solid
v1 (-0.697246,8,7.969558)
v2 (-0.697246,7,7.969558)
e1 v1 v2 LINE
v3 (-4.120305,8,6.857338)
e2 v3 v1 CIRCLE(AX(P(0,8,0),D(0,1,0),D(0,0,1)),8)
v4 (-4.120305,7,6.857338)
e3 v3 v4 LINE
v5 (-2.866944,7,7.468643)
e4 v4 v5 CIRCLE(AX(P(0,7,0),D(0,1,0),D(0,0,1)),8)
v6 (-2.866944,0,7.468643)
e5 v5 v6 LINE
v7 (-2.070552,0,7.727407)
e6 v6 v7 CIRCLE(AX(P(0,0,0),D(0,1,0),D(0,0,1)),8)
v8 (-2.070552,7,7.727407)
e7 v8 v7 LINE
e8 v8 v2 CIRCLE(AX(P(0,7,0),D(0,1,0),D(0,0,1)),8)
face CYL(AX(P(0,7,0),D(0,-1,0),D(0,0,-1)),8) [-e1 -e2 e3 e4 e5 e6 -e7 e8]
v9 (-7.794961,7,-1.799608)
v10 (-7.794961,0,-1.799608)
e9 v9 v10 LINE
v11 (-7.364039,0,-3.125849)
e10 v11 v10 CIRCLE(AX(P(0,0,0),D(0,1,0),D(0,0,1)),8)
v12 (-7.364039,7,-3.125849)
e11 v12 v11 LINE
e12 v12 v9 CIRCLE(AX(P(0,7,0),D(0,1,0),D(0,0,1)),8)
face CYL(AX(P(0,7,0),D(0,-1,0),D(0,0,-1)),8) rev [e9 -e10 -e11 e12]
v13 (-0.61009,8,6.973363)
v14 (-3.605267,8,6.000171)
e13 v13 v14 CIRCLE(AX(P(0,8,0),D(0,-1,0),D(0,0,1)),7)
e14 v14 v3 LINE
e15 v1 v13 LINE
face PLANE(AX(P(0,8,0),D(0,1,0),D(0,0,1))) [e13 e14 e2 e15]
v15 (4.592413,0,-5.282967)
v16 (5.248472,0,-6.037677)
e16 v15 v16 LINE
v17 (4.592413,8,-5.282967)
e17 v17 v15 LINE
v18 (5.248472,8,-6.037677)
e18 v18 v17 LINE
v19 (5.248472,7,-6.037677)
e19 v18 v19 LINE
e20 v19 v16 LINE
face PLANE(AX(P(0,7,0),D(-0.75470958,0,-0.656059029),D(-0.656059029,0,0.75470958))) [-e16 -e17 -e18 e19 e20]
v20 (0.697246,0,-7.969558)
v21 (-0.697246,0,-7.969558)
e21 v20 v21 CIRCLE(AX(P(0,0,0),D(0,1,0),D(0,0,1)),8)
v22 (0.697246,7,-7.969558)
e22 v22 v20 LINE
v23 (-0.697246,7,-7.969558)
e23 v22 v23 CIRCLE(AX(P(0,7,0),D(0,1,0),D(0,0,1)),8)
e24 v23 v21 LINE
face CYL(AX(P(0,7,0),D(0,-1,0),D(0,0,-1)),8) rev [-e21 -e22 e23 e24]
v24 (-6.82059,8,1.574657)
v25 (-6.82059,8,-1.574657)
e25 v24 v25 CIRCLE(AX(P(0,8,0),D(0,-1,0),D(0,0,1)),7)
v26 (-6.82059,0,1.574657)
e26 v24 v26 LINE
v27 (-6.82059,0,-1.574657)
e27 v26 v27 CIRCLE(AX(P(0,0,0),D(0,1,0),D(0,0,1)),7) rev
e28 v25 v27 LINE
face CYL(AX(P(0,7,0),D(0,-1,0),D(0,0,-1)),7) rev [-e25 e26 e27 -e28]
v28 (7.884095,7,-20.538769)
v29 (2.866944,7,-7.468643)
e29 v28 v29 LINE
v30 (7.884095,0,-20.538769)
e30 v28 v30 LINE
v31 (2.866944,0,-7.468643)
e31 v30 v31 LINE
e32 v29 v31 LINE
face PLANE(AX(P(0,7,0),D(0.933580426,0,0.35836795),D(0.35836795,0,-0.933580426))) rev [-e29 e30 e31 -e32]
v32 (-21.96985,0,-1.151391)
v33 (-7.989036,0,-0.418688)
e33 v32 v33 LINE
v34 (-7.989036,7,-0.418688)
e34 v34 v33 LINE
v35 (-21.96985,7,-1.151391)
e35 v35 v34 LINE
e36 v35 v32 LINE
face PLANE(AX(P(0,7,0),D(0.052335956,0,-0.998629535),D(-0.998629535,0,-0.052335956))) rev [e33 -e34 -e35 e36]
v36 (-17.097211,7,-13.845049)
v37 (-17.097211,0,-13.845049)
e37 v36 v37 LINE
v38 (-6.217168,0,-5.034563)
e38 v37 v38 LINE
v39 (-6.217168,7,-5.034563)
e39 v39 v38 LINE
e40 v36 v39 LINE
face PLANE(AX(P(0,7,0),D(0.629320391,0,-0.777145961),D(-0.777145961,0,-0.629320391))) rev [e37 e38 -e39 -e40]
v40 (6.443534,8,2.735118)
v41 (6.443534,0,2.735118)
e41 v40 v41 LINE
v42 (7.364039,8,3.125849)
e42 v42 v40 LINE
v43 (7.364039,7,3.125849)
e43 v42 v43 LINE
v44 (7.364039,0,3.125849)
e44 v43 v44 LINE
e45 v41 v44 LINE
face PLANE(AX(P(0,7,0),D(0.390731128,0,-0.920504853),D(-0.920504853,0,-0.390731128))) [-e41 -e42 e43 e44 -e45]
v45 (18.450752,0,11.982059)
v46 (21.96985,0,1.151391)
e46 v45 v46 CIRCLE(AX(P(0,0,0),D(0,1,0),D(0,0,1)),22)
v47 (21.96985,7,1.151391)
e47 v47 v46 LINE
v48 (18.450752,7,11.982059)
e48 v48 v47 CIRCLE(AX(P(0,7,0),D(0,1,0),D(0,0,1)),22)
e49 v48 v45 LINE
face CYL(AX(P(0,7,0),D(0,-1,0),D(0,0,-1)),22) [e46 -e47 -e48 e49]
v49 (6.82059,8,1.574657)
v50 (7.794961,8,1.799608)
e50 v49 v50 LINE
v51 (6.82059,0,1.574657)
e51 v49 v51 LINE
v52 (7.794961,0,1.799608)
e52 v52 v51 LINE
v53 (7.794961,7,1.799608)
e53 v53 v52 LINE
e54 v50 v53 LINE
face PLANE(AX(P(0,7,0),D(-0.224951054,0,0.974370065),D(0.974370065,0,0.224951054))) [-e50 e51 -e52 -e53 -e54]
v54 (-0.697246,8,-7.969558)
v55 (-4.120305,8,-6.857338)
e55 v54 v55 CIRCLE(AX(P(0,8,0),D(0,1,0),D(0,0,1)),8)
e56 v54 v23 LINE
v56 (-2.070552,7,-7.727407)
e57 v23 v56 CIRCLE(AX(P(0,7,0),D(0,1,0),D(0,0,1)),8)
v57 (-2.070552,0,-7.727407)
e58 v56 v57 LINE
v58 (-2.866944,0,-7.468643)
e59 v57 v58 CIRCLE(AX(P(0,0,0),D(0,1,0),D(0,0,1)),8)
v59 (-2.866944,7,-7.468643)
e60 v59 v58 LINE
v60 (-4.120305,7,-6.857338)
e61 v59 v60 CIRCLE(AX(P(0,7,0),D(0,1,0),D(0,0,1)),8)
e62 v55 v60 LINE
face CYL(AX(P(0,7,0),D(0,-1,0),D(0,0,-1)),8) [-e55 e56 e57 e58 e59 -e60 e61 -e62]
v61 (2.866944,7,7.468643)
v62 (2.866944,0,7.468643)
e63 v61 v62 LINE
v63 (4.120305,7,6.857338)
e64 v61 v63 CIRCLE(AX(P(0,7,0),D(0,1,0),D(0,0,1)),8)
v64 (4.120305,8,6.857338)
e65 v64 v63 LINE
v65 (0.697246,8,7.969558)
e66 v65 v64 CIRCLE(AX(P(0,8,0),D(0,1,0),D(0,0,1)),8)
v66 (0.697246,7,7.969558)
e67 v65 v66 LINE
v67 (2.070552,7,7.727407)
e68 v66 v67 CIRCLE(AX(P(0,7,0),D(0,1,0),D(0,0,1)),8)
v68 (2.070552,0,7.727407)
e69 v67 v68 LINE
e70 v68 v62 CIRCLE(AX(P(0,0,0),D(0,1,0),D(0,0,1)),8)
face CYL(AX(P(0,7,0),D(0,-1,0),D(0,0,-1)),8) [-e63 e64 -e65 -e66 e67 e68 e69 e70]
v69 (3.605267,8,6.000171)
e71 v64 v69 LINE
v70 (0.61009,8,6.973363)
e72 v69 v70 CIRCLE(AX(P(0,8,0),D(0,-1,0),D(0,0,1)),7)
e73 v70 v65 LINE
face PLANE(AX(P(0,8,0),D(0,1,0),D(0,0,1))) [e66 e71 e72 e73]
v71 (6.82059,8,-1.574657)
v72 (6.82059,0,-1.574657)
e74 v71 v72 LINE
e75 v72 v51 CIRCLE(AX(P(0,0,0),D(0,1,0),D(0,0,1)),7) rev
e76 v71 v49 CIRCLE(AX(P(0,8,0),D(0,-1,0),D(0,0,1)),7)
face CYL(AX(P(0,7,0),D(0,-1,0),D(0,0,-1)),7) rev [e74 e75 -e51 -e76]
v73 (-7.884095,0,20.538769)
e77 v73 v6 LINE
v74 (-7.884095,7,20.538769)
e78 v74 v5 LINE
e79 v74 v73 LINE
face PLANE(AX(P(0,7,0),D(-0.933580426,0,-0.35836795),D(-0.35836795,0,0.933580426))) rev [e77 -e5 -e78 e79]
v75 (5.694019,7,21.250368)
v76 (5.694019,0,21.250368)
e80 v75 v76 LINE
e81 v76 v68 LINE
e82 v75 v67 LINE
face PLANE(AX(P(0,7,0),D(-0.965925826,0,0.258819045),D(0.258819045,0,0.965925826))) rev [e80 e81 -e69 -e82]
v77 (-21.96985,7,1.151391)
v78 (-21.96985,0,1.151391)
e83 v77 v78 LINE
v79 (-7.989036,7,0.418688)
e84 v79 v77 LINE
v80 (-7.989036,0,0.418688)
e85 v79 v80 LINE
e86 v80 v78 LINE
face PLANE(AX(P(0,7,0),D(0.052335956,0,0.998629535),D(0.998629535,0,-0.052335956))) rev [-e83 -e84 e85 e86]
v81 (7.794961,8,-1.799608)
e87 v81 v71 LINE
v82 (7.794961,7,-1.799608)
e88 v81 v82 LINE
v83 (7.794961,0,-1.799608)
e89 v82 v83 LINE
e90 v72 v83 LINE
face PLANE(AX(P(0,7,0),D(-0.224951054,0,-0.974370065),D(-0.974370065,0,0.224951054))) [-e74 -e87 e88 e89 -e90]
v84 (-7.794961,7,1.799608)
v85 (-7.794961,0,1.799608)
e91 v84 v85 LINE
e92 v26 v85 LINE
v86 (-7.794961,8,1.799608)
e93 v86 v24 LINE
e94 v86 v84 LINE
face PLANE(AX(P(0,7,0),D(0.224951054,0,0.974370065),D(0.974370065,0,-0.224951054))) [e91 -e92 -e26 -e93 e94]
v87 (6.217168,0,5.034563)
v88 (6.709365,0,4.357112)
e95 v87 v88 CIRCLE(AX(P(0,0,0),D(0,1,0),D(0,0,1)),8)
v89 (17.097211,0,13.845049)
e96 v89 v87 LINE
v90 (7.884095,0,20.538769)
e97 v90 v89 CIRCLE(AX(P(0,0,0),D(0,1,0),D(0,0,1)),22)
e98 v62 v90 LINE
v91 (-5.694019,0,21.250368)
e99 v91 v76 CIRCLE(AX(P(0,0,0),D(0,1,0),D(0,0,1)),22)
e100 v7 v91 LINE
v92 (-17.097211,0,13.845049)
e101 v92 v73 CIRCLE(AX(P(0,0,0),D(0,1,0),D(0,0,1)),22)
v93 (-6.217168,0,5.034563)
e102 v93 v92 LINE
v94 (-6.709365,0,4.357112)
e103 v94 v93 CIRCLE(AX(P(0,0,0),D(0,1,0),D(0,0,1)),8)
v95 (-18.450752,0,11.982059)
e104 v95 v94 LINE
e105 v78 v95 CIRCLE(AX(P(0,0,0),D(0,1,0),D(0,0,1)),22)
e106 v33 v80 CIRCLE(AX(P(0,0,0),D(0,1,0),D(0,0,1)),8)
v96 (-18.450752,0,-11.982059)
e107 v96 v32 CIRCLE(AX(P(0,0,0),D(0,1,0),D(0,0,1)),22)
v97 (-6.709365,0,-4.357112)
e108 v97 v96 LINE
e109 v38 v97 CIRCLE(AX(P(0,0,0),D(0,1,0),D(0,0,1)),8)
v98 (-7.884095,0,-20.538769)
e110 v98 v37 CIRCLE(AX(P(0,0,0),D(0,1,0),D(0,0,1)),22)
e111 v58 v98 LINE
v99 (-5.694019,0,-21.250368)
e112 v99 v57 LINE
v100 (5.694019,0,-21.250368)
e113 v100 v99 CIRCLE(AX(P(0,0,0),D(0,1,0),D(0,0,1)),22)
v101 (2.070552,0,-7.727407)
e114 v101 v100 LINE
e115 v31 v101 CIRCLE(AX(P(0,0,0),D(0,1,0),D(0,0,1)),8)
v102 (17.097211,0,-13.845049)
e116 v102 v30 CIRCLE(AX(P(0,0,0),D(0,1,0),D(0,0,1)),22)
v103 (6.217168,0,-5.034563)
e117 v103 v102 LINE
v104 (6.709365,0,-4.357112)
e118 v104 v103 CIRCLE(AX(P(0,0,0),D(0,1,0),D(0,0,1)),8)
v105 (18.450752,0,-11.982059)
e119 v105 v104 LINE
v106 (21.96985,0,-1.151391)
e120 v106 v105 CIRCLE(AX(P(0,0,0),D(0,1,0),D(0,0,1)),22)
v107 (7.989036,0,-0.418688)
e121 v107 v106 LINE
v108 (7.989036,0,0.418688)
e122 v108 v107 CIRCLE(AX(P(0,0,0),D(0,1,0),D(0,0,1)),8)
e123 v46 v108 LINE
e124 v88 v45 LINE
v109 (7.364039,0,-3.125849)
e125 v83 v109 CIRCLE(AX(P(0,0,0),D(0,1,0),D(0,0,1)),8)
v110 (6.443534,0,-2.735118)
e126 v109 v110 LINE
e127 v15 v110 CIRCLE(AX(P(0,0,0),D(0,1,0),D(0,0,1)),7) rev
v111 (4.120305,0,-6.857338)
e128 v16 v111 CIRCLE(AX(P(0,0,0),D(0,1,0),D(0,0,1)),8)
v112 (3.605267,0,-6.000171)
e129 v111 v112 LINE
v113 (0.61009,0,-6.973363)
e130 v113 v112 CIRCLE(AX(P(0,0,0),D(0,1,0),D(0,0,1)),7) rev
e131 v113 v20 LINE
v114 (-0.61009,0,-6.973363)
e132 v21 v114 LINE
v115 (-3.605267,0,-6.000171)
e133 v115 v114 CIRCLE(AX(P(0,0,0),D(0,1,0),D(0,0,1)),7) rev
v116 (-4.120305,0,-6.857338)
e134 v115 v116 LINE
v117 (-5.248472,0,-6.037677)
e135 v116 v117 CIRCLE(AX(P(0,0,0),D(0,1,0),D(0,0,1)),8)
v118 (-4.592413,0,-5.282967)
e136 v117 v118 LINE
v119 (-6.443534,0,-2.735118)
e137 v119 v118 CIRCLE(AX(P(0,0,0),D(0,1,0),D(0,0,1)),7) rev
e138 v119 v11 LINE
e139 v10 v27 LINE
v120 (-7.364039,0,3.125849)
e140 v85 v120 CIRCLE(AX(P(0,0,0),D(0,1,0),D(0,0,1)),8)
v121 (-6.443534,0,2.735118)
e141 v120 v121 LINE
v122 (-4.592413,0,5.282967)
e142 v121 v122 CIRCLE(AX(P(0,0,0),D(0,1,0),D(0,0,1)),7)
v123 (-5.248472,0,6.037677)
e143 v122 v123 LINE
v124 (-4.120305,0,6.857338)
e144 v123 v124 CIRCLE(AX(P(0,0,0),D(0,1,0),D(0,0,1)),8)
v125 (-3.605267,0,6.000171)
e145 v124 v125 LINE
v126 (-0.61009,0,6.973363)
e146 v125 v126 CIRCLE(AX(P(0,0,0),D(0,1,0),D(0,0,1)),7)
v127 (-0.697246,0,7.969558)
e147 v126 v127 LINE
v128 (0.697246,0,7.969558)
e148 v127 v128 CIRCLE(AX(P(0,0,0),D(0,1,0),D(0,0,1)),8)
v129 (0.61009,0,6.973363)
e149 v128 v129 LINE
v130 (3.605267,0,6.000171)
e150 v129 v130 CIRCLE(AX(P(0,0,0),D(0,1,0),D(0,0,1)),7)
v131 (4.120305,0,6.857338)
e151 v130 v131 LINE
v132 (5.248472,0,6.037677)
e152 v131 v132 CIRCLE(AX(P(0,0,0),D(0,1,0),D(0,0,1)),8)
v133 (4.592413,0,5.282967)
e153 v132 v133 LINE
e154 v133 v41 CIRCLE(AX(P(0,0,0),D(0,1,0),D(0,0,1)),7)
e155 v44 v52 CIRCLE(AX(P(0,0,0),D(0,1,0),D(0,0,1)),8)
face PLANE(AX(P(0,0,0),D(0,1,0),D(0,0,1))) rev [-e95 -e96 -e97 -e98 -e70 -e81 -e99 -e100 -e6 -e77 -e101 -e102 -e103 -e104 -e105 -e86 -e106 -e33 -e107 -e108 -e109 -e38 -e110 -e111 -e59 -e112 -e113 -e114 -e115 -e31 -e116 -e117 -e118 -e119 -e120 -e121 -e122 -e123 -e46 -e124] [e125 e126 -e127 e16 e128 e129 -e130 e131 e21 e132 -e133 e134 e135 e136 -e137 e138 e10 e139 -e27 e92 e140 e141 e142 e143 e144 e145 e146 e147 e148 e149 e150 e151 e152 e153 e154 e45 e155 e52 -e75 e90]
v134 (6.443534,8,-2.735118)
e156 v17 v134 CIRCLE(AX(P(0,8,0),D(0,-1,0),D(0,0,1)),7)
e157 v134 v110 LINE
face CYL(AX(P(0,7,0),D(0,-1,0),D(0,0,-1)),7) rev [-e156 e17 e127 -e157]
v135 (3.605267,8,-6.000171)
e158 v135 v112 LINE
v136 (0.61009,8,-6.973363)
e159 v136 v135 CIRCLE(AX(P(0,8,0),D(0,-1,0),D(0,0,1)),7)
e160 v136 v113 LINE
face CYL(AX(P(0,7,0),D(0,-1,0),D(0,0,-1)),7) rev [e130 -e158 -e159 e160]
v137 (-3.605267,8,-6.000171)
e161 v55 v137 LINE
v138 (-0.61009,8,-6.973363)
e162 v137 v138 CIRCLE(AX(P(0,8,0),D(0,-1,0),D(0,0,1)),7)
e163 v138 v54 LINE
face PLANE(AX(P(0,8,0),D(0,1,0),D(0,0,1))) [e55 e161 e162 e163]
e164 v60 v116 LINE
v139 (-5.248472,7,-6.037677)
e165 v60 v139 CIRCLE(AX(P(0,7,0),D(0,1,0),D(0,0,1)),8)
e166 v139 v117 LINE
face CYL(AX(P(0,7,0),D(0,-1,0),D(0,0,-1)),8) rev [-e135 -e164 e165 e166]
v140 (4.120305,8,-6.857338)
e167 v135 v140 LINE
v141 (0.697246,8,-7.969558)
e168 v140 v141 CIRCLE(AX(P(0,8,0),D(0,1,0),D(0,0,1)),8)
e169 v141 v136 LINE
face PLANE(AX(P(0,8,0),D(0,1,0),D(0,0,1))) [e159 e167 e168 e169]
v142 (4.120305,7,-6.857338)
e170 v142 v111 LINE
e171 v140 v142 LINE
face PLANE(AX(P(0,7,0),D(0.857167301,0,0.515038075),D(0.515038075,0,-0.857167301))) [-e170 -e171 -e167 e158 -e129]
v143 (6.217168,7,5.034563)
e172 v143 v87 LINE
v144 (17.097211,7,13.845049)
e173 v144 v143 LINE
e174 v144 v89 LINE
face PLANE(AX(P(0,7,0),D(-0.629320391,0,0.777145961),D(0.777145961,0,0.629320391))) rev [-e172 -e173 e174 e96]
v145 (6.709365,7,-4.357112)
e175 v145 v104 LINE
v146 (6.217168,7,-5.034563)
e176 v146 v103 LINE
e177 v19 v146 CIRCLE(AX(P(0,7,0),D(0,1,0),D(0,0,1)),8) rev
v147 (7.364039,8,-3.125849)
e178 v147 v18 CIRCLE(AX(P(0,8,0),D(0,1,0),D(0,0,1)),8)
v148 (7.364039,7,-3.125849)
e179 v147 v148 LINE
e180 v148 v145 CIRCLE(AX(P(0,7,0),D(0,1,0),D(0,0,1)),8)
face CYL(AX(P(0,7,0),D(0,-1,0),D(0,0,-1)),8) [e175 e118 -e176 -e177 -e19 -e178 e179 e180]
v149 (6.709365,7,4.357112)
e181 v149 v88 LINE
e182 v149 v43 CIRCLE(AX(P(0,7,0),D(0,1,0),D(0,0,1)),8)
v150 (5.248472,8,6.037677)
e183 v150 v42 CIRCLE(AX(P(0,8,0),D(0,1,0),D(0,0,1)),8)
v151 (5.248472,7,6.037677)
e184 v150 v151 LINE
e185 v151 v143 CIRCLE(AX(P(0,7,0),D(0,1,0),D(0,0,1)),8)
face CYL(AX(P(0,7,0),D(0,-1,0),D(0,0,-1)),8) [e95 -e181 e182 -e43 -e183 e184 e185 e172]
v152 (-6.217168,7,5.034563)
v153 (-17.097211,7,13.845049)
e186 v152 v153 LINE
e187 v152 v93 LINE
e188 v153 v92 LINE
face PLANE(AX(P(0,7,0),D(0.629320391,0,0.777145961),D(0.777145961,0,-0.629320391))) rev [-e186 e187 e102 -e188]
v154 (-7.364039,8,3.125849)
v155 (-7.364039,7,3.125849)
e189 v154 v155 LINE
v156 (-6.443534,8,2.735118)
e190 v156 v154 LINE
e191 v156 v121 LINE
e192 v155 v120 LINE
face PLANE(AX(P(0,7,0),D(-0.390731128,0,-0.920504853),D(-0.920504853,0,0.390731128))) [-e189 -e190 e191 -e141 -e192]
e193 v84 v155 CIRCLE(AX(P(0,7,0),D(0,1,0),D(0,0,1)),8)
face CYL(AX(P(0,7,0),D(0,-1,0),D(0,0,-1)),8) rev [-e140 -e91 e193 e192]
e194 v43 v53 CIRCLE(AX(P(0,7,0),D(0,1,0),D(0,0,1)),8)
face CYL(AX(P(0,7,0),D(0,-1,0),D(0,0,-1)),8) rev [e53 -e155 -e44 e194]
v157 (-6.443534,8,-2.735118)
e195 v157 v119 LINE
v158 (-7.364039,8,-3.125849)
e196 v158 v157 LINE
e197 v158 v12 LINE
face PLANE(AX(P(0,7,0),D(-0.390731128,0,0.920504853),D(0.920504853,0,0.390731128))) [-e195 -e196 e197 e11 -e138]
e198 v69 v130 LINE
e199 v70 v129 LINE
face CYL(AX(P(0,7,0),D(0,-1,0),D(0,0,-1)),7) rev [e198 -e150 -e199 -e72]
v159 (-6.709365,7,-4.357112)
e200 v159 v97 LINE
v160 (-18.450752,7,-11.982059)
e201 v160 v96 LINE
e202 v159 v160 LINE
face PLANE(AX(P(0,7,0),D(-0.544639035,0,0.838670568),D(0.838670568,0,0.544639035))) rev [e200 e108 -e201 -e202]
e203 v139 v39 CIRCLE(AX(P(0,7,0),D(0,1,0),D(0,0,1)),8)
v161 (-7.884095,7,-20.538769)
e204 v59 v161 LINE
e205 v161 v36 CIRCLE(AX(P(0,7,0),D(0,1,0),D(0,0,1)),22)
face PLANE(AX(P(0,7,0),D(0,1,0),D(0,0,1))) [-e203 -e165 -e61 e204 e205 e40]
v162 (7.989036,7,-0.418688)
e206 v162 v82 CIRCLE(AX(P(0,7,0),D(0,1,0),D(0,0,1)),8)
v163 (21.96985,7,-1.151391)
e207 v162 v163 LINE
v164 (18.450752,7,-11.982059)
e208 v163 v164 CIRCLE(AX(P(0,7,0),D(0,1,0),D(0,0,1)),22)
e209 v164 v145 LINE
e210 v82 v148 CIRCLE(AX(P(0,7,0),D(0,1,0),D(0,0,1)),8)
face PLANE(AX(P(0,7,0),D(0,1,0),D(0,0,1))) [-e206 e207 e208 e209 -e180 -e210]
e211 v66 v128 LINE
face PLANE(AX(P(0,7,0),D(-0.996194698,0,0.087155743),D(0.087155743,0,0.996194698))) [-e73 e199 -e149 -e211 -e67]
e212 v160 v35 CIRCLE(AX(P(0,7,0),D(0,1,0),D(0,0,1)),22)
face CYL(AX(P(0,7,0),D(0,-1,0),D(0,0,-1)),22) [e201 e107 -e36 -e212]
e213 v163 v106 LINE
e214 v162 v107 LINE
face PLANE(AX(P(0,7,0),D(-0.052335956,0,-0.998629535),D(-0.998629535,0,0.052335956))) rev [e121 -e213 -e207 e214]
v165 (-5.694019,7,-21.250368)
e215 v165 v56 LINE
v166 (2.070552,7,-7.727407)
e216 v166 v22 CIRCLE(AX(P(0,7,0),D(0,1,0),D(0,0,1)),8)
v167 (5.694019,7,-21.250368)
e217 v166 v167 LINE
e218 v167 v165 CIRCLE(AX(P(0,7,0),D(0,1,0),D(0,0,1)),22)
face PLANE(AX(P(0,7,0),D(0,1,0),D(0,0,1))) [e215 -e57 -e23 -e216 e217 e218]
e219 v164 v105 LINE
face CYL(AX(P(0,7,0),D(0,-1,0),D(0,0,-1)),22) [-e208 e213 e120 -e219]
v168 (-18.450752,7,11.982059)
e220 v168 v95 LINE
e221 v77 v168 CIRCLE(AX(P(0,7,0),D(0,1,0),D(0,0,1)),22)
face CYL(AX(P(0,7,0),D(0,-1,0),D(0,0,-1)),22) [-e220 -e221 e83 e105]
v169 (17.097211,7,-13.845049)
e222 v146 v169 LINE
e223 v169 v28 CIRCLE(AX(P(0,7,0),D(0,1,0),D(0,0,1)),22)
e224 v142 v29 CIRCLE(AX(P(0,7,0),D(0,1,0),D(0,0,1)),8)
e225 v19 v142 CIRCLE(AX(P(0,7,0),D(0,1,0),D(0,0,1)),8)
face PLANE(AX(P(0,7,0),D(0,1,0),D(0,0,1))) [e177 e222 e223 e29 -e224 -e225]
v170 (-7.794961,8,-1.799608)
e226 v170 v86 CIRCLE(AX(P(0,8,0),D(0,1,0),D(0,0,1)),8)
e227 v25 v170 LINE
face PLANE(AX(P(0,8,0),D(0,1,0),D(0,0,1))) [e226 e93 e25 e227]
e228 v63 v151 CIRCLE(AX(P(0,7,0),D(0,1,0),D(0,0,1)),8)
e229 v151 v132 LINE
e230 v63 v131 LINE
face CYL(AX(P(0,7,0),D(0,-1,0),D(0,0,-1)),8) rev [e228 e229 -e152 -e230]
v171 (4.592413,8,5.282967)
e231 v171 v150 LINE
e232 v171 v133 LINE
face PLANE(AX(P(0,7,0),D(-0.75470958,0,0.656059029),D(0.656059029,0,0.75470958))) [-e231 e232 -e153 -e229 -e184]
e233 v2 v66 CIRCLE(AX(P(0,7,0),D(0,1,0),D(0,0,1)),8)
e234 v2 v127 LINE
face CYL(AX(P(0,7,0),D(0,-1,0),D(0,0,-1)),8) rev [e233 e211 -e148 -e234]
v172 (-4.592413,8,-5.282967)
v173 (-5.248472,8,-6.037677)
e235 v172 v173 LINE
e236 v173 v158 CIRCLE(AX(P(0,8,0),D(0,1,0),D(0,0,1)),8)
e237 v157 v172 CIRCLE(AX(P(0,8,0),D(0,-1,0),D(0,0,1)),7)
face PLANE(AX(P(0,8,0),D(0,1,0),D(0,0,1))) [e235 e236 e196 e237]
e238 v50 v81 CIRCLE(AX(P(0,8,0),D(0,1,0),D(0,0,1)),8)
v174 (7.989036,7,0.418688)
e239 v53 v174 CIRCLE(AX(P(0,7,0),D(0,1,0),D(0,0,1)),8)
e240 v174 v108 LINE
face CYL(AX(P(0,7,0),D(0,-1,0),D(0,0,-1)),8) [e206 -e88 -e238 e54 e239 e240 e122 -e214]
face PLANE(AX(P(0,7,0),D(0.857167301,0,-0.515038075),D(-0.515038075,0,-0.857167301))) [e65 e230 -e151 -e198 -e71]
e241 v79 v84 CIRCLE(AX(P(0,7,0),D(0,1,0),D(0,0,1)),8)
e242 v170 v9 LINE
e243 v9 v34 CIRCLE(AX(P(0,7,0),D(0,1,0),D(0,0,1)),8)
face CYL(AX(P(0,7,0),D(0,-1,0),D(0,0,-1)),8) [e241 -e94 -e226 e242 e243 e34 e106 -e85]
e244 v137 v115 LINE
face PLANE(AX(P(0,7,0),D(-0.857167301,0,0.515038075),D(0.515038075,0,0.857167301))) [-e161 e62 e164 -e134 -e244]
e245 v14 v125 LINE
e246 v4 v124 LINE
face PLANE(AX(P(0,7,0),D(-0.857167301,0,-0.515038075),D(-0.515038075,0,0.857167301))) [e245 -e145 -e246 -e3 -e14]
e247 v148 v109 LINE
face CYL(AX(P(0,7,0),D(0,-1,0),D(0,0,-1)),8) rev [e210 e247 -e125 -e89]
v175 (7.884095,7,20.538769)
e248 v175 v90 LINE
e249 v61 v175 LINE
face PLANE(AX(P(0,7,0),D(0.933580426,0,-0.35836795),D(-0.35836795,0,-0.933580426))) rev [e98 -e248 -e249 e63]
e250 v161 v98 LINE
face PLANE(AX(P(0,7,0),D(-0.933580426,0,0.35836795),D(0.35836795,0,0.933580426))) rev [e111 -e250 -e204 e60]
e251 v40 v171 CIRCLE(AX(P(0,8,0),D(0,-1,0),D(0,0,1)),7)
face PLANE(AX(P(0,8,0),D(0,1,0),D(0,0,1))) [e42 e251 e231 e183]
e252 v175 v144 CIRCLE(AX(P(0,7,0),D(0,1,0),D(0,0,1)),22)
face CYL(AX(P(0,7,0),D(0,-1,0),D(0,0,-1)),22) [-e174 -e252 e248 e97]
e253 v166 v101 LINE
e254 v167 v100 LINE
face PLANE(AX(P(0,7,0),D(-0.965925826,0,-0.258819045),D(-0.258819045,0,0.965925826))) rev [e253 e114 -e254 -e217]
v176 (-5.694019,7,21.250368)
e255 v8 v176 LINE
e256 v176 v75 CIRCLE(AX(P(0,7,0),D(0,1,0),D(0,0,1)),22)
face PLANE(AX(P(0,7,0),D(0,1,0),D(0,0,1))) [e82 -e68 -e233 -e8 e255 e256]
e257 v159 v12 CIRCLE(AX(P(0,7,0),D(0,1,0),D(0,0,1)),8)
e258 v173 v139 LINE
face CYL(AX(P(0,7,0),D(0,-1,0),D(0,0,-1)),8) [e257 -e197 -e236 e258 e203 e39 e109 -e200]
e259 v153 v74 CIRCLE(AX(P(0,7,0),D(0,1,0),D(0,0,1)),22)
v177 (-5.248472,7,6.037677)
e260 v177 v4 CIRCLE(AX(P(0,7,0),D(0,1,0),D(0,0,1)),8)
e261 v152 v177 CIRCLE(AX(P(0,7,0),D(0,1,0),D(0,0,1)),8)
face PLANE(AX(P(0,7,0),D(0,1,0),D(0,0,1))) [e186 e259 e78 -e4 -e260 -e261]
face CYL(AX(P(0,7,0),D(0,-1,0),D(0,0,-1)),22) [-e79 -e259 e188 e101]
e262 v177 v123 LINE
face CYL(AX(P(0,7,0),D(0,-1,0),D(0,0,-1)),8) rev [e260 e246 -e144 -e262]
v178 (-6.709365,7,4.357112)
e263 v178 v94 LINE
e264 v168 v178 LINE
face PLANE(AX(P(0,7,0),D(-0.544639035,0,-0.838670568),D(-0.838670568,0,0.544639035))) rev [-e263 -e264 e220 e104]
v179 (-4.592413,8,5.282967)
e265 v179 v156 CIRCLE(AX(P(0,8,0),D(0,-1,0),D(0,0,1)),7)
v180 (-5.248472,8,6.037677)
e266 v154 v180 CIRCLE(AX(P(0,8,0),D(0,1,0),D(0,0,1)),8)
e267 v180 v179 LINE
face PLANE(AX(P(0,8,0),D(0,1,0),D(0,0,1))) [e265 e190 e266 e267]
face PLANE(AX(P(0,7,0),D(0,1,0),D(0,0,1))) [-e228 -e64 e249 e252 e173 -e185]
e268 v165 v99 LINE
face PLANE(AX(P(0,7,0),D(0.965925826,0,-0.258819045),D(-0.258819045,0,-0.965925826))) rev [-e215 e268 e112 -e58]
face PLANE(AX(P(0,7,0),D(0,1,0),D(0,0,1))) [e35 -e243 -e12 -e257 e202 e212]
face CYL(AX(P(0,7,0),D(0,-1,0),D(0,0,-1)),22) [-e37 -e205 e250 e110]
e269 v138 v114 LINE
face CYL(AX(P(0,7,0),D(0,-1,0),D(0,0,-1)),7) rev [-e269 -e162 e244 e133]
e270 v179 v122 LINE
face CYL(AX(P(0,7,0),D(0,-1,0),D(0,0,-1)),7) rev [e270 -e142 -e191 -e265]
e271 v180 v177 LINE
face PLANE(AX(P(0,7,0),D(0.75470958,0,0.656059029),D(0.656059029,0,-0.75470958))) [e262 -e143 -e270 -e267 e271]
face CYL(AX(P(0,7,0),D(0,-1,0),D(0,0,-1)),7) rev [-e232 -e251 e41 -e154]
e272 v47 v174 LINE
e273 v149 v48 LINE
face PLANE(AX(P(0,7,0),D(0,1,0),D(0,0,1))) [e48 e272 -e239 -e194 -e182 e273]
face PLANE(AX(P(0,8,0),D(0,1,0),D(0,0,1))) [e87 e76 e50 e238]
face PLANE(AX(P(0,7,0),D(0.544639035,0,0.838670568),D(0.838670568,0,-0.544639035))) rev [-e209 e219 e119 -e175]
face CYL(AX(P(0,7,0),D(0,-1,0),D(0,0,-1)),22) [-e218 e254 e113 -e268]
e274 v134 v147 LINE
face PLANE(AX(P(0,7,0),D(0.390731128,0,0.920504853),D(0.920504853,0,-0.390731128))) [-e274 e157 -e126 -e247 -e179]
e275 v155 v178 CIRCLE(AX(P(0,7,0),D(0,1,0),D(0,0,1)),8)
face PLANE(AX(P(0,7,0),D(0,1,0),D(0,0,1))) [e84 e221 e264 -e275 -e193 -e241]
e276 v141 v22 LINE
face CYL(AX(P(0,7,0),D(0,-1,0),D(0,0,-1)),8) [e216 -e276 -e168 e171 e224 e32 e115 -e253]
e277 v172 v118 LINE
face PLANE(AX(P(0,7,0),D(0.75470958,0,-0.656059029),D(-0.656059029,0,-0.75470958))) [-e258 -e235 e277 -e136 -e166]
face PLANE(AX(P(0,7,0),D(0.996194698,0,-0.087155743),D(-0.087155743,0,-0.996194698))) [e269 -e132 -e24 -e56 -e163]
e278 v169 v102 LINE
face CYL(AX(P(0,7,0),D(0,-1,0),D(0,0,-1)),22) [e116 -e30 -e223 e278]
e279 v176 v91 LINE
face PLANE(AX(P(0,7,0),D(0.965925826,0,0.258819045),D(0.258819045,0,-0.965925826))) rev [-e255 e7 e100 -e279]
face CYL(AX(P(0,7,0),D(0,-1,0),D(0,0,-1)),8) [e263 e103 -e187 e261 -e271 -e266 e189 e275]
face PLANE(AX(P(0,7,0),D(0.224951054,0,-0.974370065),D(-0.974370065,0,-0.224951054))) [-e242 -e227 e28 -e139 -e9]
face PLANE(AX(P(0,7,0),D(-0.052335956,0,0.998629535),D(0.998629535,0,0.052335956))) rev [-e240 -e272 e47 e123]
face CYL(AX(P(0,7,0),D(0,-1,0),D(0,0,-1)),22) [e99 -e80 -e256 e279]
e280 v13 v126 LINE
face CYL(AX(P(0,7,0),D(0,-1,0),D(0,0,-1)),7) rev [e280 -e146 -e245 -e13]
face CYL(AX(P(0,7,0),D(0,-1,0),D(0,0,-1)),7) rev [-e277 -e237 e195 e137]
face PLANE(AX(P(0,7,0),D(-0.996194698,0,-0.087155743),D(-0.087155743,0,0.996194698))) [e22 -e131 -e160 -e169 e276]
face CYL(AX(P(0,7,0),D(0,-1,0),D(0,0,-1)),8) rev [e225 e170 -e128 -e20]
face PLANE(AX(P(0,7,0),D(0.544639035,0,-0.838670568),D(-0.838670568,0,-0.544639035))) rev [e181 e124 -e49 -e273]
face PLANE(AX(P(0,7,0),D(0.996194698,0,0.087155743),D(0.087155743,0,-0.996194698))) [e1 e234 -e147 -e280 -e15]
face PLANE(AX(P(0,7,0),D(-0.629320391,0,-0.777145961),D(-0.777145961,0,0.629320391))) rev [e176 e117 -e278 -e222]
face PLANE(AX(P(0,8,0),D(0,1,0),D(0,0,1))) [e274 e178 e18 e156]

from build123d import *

# Parameters (mm, degrees)
BOSS_EXTRUDE1_DEPTH = 7
BOSS_EXTRUDE2_DEPTH = 1


with BuildPart() as part:
    # Sketch2 → Boss-Extrude1 (new body)
    with BuildSketch(Plane(origin=(0, 0, 0), x_dir=(1, 0, 0), z_dir=(0, 1, 0))):
        with BuildLine():
            ThreePointArc((5.694018992, 21.250368178), (0, 22), (-5.694018992, 21.250368178))
            Line((-5.694018992, 21.250368178), (-2.070552361, 7.72740661))
            ThreePointArc((-2.070552361, 7.72740661), (-2.472135955, 7.60845213), (-2.866943596, 7.468643412))
            Line((-2.866943596, 7.468643412), (-7.88409489, 20.538769383))
            ThreePointArc((-7.88409489, 20.538769383), (-12.93127555, 17.798373876), (-17.097211152, 13.845048603))
            Line((-17.097211152, 13.845048603), (-6.217167692, 5.034563128))
            ThreePointArc((-6.217167692, 5.034563128), (-6.472135955, 4.702282018), (-6.709364544, 4.35711228))
            Line((-6.709364544, 4.35711228), (-18.450752495, 11.98205877))
            ThreePointArc((-18.450752495, 11.98205877), (-20.923243358, 6.798373876), (-21.969849765, 1.151391037))
            Line((-21.969849765, 1.151391037), (-7.989036278, 0.41868765))
            ThreePointArc((-7.989036278, 0.41868765), (-8, 0), (-7.989036278, -0.41868765))
            Line((-7.989036278, -0.41868765), (-21.969849765, -1.151391037))
            ThreePointArc((-21.969849765, -1.151391037), (-20.923243358, -6.798373876), (-18.450752495, -11.98205877))
            Line((-18.450752495, -11.98205877), (-6.709364544, -4.35711228))
            ThreePointArc((-6.709364544, -4.35711228), (-6.472135955, -4.702282018), (-6.217167692, -5.034563128))
            Line((-6.217167692, -5.034563128), (-17.097211152, -13.845048603))
            ThreePointArc((-17.097211152, -13.845048603), (-12.93127555, -17.798373876), (-7.88409489, -20.538769383))
            Line((-7.88409489, -20.538769383), (-2.866943596, -7.468643412))
            ThreePointArc((-2.866943596, -7.468643412), (-2.472135955, -7.60845213), (-2.070552361, -7.72740661))
            Line((-2.070552361, -7.72740661), (-5.694018992, -21.250368178))
            ThreePointArc((-5.694018992, -21.250368178), (0, -22), (5.694018992, -21.250368178))
            Line((5.694018992, -21.250368178), (2.070552361, -7.72740661))
            ThreePointArc((2.070552361, -7.72740661), (2.472135955, -7.60845213), (2.866943596, -7.468643412))
            Line((2.866943596, -7.468643412), (7.88409489, -20.538769383))
            ThreePointArc((7.88409489, -20.538769383), (12.93127555, -17.798373876), (17.097211152, -13.845048603))
            Line((17.097211152, -13.845048603), (6.217167692, -5.034563128))
            ThreePointArc((6.217167692, -5.034563128), (6.472135955, -4.702282018), (6.709364544, -4.35711228))
            Line((6.709364544, -4.35711228), (18.450752495, -11.98205877))
            ThreePointArc((18.450752495, -11.98205877), (20.923243358, -6.798373876), (21.969849765, -1.151391037))
            Line((21.969849765, -1.151391037), (7.989036278, -0.41868765))
            ThreePointArc((7.989036278, -0.41868765), (8, 0), (7.989036278, 0.41868765))
            Line((7.989036278, 0.41868765), (21.969849765, 1.151391037))
            ThreePointArc((21.969849765, 1.151391037), (20.923243358, 6.798373876), (18.450752495, 11.98205877))
            Line((18.450752495, 11.98205877), (6.709364544, 4.35711228))
            ThreePointArc((6.709364544, 4.35711228), (6.472135955, 4.702282018), (6.217167692, 5.034563128))
            Line((6.217167692, 5.034563128), (17.097211152, 13.845048603))
            ThreePointArc((17.097211152, 13.845048603), (12.93127555, 17.798373876), (7.88409489, 20.538769383))
            Line((7.88409489, 20.538769383), (2.866943596, 7.468643412))
            ThreePointArc((2.866943596, 7.468643412), (2.472135955, 7.60845213), (2.070552361, 7.72740661))
            Line((2.070552361, 7.72740661), (5.694018992, 21.250368178))
        make_face()
        with BuildLine():
            Line((0.697245942, 7.969557585), (0.610090199, 6.973362887))
            ThreePointArc((0.610090199, 6.973362887), (1.215537244, 6.893654271), (1.811733316, 6.761480784))
            ThreePointArc((1.811733316, 6.761480784), (2.163118961, 6.657395614), (2.508575647, 6.535062985))
            ThreePointArc((2.508575647, 6.535062985), (3.068598028, 6.291558324), (3.605266524, 6.000171105))
            Line((3.605266524, 6.000171105), (4.120304599, 6.857338406))
            ThreePointArc((4.120304599, 6.857338406), (4.702282018, 6.472135955), (5.248472232, 6.037676642))
            Line((5.248472232, 6.037676642), (4.592413203, 5.282967062))
            ThreePointArc((4.592413203, 5.282967062), (5.035378602, 4.862608593), (5.44002173, 4.405242737))
            ThreePointArc((5.44002173, 4.405242737), (5.663118961, 4.114496766), (5.870693976, 3.812473245))
            ThreePointArc((5.870693976, 3.812473245), (6.18063315, 3.28630094), (6.443533974, 2.735117899))
            Line((6.443533974, 2.735117899), (7.364038828, 3.125849028))
            ThreePointArc((7.364038828, 3.125849028), (7.60845213, 2.472135955), (7.794960518, 1.799608435))
            Line((7.794960518, 1.799608435), (6.820590453, 1.57465738))
            ThreePointArc((6.820590453, 1.57465738), (6.931876481, 0.974211707), (6.990406743, 0.366351694))
            ThreePointArc((6.990406743, 0.366351694), (7, 0), (6.990406743, -0.366351694))
            ThreePointArc((6.990406743, -0.366351694), (6.931876481, -0.974211707), (6.820590453, -1.57465738))
            Line((6.820590453, -1.57465738), (7.794960518, -1.799608435))
            ThreePointArc((7.794960518, -1.799608435), (7.60845213, -2.472135955), (7.364038828, -3.125849028))
            Line((7.364038828, -3.125849028), (6.443533974, -2.735117899))
            ThreePointArc((6.443533974, -2.735117899), (6.18063315, -3.28630094), (5.870693976, -3.812473245))
            ThreePointArc((5.870693976, -3.812473245), (5.663118961, -4.114496766), (5.44002173, -4.405242737))
            ThreePointArc((5.44002173, -4.405242737), (5.035378602, -4.862608593), (4.592413203, -5.282967062))
            Line((4.592413203, -5.282967062), (5.248472232, -6.037676642))
            ThreePointArc((5.248472232, -6.037676642), (4.702282018, -6.472135955), (4.120304599, -6.857338406))
            Line((4.120304599, -6.857338406), (3.605266524, -6.000171105))
            ThreePointArc((3.605266524, -6.000171105), (3.068598028, -6.291558324), (2.508575647, -6.535062985))
            ThreePointArc((2.508575647, -6.535062985), (2.163118961, -6.657395614), (1.811733316, -6.761480784))
            ThreePointArc((1.811733316, -6.761480784), (1.215537244, -6.893654271), (0.610090199, -6.973362887))
            Line((0.610090199, -6.973362887), (0.697245942, -7.969557585))
            ThreePointArc((0.697245942, -7.969557585), (0, -8), (-0.697245942, -7.969557585))
            Line((-0.697245942, -7.969557585), (-0.610090199, -6.973362887))
            ThreePointArc((-0.610090199, -6.973362887), (-1.215537244, -6.893654271), (-1.811733316, -6.761480784))
            ThreePointArc((-1.811733316, -6.761480784), (-2.163118961, -6.657395614), (-2.508575647, -6.535062985))
            ThreePointArc((-2.508575647, -6.535062985), (-3.068598028, -6.291558324), (-3.605266524, -6.000171105))
            Line((-3.605266524, -6.000171105), (-4.120304599, -6.857338406))
            ThreePointArc((-4.120304599, -6.857338406), (-4.702282018, -6.472135955), (-5.248472232, -6.037676642))
            Line((-5.248472232, -6.037676642), (-4.592413203, -5.282967062))
            ThreePointArc((-4.592413203, -5.282967062), (-5.035378602, -4.862608593), (-5.44002173, -4.405242737))
            ThreePointArc((-5.44002173, -4.405242737), (-5.663118961, -4.114496766), (-5.870693976, -3.812473245))
            ThreePointArc((-5.870693976, -3.812473245), (-6.18063315, -3.28630094), (-6.443533974, -2.735117899))
            Line((-6.443533974, -2.735117899), (-7.364038828, -3.125849028))
            ThreePointArc((-7.364038828, -3.125849028), (-7.60845213, -2.472135955), (-7.794960518, -1.799608435))
            Line((-7.794960518, -1.799608435), (-6.820590453, -1.57465738))
            ThreePointArc((-6.820590453, -1.57465738), (-6.931876481, -0.974211707), (-6.990406743, -0.366351694))
            ThreePointArc((-6.990406743, -0.366351694), (-7, 0), (-6.990406743, 0.366351694))
            ThreePointArc((-6.990406743, 0.366351694), (-6.931876481, 0.974211707), (-6.820590453, 1.57465738))
            Line((-6.820590453, 1.57465738), (-7.794960518, 1.799608435))
            ThreePointArc((-7.794960518, 1.799608435), (-7.60845213, 2.472135955), (-7.364038828, 3.125849028))
            Line((-7.364038828, 3.125849028), (-6.443533974, 2.735117899))
            ThreePointArc((-6.443533974, 2.735117899), (-6.18063315, 3.28630094), (-5.870693976, 3.812473245))
            ThreePointArc((-5.870693976, 3.812473245), (-5.663118961, 4.114496766), (-5.44002173, 4.405242737))
            ThreePointArc((-5.44002173, 4.405242737), (-5.035378602, 4.862608593), (-4.592413203, 5.282967062))
            Line((-4.592413203, 5.282967062), (-5.248472232, 6.037676642))
            ThreePointArc((-5.248472232, 6.037676642), (-4.702282018, 6.472135955), (-4.120304599, 6.857338406))
            Line((-4.120304599, 6.857338406), (-3.605266524, 6.000171105))
            ThreePointArc((-3.605266524, 6.000171105), (-3.068598028, 6.291558324), (-2.508575647, 6.535062985))
            ThreePointArc((-2.508575647, 6.535062985), (-2.163118961, 6.657395614), (-1.811733316, 6.761480784))
            ThreePointArc((-1.811733316, 6.761480784), (-1.215537244, 6.893654271), (-0.610090199, 6.973362887))
            Line((-0.610090199, 6.973362887), (-0.697245942, 7.969557585))
            ThreePointArc((-0.697245942, 7.969557585), (0, 8), (0.697245942, 7.969557585))
        make_face(mode=Mode.SUBTRACT)
    extrude(amount=BOSS_EXTRUDE1_DEPTH)

    # Sketch3 → Boss-Extrude2 (add)
    with BuildSketch(Plane(origin=(0, 7, 0), x_dir=(1, 0, 0), z_dir=(0, 1, 0))):
        with BuildLine():
            Line((-7.794960518, 1.799608435), (-6.820590453, 1.57465738))
            ThreePointArc((-6.820590453, 1.57465738), (-7, 0), (-6.820590453, -1.57465738))
            Line((-6.820590453, -1.57465738), (-7.794960518, -1.799608435))
            ThreePointArc((-7.794960518, -1.799608435), (-8, 0), (-7.794960518, 1.799608435))
        make_face()
        with BuildLine():
            Line((-7.364038828, -3.125849028), (-6.443533974, -2.735117899))
            ThreePointArc((-6.443533974, -2.735117899), (-5.663118961, -4.114496766), (-4.592413203, -5.282967062))
            Line((-4.592413203, -5.282967062), (-5.248472232, -6.037676642))
            ThreePointArc((-5.248472232, -6.037676642), (-6.472135955, -4.702282018), (-7.364038828, -3.125849028))
        make_face()
        with BuildLine():
            Line((-4.120304599, -6.857338406), (-3.605266524, -6.000171105))
            ThreePointArc((-3.605266524, -6.000171105), (-2.163118961, -6.657395614), (-0.610090199, -6.973362887))
            Line((-0.610090199, -6.973362887), (-0.697245942, -7.969557585))
            ThreePointArc((-0.697245942, -7.969557585), (-2.472135955, -7.60845213), (-4.120304599, -6.857338406))
        make_face()
        with BuildLine():
            Line((0.697245942, -7.969557585), (0.610090199, -6.973362887))
            ThreePointArc((0.610090199, -6.973362887), (2.163118961, -6.657395614), (3.605266524, -6.000171105))
            Line((3.605266524, -6.000171105), (4.120304599, -6.857338406))
            ThreePointArc((4.120304599, -6.857338406), (2.472135955, -7.60845213), (0.697245942, -7.969557585))
        make_face()
        with BuildLine():
            Line((5.248472232, -6.037676642), (4.592413203, -5.282967062))
            ThreePointArc((4.592413203, -5.282967062), (5.663118961, -4.114496766), (6.443533974, -2.735117899))
            Line((6.443533974, -2.735117899), (7.364038828, -3.125849028))
            ThreePointArc((7.364038828, -3.125849028), (6.472135955, -4.702282018), (5.248472232, -6.037676642))
        make_face()
        with BuildLine():
            Line((7.794960518, -1.799608435), (6.820590453, -1.57465738))
            ThreePointArc((6.820590453, -1.57465738), (7, 0), (6.820590453, 1.57465738))
            Line((6.820590453, 1.57465738), (7.794960518, 1.799608435))
            ThreePointArc((7.794960518, 1.799608435), (8, 0), (7.794960518, -1.799608435))
        make_face()
        with BuildLine():
            Line((7.364038828, 3.125849028), (6.443533974, 2.735117899))
            ThreePointArc((6.443533974, 2.735117899), (5.663118961, 4.114496766), (4.592413203, 5.282967062))
            Line((4.592413203, 5.282967062), (5.248472232, 6.037676642))
            ThreePointArc((5.248472232, 6.037676642), (6.472135955, 4.702282018), (7.364038828, 3.125849028))
        make_face()
        with BuildLine():
            Line((4.120304599, 6.857338406), (3.605266524, 6.000171105))
            ThreePointArc((3.605266524, 6.000171105), (2.163118961, 6.657395614), (0.610090199, 6.973362887))
            Line((0.610090199, 6.973362887), (0.697245942, 7.969557585))
            ThreePointArc((0.697245942, 7.969557585), (2.472135955, 7.60845213), (4.120304599, 6.857338406))
        make_face()
        with BuildLine():
            Line((-0.697245942, 7.969557585), (-0.610090199, 6.973362887))
            ThreePointArc((-0.610090199, 6.973362887), (-2.163118961, 6.657395614), (-3.605266524, 6.000171105))
            Line((-3.605266524, 6.000171105), (-4.120304599, 6.857338406))
            ThreePointArc((-4.120304599, 6.857338406), (-2.472135955, 7.60845213), (-0.697245942, 7.969557585))
        make_face()
        with BuildLine():
            Line((-5.248472232, 6.037676642), (-4.592413203, 5.282967062))
            ThreePointArc((-4.592413203, 5.282967062), (-5.663118961, 4.114496766), (-6.443533974, 2.735117899))
            Line((-6.443533974, 2.735117899), (-7.364038828, 3.125849028))
            ThreePointArc((-7.364038828, 3.125849028), (-6.472135955, 4.702282018), (-5.248472232, 6.037676642))
        make_face()
    extrude(amount=BOSS_EXTRUDE2_DEPTH)


solid = part.part
